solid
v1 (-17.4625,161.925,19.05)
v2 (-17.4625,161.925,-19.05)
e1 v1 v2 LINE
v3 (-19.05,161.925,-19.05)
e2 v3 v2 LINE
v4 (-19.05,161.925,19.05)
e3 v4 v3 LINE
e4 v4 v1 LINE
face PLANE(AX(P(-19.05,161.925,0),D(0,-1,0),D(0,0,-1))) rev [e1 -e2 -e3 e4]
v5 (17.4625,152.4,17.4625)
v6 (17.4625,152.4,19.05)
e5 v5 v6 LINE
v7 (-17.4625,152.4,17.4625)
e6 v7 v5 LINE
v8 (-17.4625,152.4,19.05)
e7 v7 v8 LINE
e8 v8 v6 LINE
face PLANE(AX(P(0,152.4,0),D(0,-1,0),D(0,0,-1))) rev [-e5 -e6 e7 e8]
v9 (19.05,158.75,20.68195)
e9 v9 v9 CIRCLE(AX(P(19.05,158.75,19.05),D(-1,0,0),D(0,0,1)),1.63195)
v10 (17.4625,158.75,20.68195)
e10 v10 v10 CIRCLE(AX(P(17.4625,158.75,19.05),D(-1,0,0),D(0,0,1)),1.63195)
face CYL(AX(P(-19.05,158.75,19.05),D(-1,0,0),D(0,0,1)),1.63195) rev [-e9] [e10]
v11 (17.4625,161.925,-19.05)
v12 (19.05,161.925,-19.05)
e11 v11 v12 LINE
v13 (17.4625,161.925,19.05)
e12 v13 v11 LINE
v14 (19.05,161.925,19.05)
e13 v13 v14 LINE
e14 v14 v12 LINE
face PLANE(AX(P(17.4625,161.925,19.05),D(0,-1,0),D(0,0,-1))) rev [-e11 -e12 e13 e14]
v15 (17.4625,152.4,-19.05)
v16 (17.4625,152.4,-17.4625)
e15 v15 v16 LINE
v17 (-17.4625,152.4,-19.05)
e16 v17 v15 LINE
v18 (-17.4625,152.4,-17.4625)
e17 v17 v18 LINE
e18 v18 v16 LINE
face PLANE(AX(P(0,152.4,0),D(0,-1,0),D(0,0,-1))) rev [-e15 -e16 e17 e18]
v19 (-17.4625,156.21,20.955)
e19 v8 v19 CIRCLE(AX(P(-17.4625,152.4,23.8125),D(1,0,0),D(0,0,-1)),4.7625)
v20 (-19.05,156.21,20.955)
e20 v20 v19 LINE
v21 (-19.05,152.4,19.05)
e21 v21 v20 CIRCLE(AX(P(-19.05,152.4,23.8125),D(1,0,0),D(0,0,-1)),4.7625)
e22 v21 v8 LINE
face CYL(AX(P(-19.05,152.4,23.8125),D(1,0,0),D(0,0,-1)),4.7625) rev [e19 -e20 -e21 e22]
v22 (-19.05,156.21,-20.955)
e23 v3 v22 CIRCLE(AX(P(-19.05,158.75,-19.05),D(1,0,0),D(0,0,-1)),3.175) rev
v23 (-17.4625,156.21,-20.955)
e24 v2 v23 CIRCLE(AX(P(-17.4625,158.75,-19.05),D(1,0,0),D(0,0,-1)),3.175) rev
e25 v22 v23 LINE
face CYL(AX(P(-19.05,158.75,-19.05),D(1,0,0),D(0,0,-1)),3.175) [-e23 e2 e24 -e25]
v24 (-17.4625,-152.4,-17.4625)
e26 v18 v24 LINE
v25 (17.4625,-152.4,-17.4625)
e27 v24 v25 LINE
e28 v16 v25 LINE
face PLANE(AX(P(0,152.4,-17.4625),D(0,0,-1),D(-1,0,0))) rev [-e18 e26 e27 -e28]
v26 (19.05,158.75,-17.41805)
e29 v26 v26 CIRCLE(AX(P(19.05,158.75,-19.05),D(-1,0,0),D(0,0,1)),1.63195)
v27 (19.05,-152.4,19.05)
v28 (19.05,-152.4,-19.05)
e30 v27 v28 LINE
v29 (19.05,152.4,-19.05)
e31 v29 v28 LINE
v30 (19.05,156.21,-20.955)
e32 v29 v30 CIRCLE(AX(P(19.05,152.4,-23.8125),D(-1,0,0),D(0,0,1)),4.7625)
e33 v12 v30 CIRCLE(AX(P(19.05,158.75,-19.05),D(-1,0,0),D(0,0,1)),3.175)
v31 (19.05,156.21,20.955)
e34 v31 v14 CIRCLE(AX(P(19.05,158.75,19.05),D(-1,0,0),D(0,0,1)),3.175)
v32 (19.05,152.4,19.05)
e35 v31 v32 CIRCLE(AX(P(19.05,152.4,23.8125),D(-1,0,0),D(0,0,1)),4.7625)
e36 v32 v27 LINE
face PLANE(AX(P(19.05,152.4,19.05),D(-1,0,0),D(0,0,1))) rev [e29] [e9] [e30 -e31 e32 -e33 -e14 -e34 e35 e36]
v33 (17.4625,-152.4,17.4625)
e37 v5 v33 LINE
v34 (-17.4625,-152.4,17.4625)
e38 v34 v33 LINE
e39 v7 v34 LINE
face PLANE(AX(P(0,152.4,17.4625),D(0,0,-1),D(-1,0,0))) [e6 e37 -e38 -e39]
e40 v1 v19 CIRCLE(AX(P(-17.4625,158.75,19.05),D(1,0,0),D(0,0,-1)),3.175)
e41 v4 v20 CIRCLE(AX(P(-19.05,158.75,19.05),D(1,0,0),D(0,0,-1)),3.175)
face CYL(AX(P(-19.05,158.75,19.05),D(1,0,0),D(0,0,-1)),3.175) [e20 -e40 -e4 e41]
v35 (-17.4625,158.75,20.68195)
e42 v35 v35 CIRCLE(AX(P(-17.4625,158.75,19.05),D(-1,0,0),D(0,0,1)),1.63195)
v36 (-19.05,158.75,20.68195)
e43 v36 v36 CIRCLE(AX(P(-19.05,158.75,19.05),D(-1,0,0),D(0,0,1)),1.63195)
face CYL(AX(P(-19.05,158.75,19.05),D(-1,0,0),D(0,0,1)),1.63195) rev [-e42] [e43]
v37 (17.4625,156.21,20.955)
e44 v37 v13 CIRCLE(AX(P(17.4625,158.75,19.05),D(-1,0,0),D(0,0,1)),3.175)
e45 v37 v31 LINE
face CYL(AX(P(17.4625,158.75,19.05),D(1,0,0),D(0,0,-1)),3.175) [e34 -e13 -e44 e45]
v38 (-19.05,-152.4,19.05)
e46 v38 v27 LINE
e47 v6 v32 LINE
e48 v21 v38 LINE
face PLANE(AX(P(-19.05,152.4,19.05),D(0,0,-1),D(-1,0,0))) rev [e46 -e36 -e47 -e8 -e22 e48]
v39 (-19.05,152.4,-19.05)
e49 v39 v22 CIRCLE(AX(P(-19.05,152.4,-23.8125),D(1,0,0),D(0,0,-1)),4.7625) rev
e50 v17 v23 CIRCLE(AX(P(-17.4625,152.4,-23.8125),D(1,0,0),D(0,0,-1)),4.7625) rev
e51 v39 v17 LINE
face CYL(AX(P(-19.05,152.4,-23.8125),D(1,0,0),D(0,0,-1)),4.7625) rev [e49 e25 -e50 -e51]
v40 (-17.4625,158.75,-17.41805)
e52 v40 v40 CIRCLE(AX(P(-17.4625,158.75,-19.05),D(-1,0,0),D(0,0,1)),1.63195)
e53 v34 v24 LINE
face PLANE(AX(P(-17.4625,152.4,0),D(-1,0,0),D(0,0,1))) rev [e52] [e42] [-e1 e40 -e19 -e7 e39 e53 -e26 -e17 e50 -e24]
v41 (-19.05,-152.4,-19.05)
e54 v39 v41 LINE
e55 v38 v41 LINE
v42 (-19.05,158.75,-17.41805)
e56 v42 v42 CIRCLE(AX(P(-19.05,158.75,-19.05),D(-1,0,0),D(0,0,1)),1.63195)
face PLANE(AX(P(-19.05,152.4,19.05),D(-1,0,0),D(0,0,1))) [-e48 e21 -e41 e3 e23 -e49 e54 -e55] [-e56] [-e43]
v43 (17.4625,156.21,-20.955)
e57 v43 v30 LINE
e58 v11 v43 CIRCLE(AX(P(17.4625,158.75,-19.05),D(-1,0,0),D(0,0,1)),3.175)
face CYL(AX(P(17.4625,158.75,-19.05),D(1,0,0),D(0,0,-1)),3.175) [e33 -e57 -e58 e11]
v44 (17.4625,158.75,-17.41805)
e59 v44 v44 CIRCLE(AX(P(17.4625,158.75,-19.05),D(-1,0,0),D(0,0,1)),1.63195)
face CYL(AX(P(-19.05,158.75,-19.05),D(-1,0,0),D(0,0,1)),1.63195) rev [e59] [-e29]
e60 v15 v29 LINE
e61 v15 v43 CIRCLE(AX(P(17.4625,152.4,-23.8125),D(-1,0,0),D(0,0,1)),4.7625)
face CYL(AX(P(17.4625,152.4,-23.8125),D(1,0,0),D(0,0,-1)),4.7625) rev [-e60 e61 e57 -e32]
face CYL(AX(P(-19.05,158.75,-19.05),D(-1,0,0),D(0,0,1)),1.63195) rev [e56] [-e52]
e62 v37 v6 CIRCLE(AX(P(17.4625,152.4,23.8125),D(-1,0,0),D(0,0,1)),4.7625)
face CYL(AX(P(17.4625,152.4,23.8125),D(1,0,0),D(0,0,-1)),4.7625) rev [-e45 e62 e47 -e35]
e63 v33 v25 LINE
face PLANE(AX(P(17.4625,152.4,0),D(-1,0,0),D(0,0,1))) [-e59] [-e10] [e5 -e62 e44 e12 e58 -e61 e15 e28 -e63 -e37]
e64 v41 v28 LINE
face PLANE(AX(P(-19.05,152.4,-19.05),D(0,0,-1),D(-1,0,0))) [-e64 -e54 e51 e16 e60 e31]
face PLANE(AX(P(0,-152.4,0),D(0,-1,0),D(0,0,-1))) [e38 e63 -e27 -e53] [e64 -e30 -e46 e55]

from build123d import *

# Parameters (mm, degrees)
SKETCH1_W             = 38.1
SKETCH1_H             = 38.1
SKETCH1_W_2           = 34.925
SKETCH1_H_2           = 34.925
EXTRUDE_THIN1_DEPTH   = 152.4
BOSS_EXTRUDE1_DEPTH   = 1.5875
BOSS_EXTRUDE2_START   = 34.925
BOSS_EXTRUDE2_DEPTH   = 1.5875
F_4_CLEARANCE_HOLE1_D = 3.2639


# Read off the part's stored shape, not the designer's step: Boss-Extrude2
with BuildPart() as part:
    # Sketch1 → Extrude-Thin1 (new, symmetric)
    with BuildSketch(Plane(origin=(0, 0, 0), x_dir=(1, 0, 0), z_dir=(0, 1, 0))):
        Rectangle(SKETCH1_W, SKETCH1_H)
        Rectangle(SKETCH1_W_2, SKETCH1_H_2, mode=Mode.SUBTRACT)
    extrude(amount=EXTRUDE_THIN1_DEPTH, both=True)

    # Sketch3 → Boss-Extrude1 (add)
    with BuildSketch(Plane(origin=(-17.4625, 0, 0), x_dir=(0, 0, -1), z_dir=(1, 0, 0))):
        with BuildLine():
            Line((-19.05, 152.4), (19.05, 152.4))
            ThreePointArc((19.05, 152.4), (19.552790503, 154.529854749), (20.955, 156.21))
            ThreePointArc((20.955, 156.21), (22.062069471, 159.754023157), (19.05, 161.925))
            Line((19.05, 161.925), (-19.05, 161.925))
            ThreePointArc((-19.05, 161.925), (-22.062069471, 159.754023157), (-20.955, 156.21))
            ThreePointArc((-20.955, 156.21), (-19.552790503, 154.529854749), (-19.05, 152.4))
        make_face()
    extrude(amount=-BOSS_EXTRUDE1_DEPTH)

    # Boss-Extrude2 outline → Boss-Extrude2 (add)
    with BuildSketch(Plane(origin=(-17.4625, 0, 0), x_dir=(0, 0, -1), z_dir=(1, 0, 0)).offset(BOSS_EXTRUDE2_START)):
        with BuildLine():
            Line((19.05, 161.925), (-19.05, 161.925))
            ThreePointArc((-19.05, 161.925), (-22.062069471, 159.754023157), (-20.955, 156.21))
            ThreePointArc((-20.955, 156.21), (-19.552790503, 154.529854749), (-19.05, 152.4))
            Line((-19.05, 152.4), (19.05, 152.4))
            ThreePointArc((19.05, 152.4), (19.552790503, 154.529854749), (20.955, 156.21))
            ThreePointArc((20.955, 156.21), (22.062069471, 159.754023157), (19.05, 161.925))
        make_face()
    extrude(amount=BOSS_EXTRUDE2_DEPTH)

    # #4 Clearance Hole1 (through all)
    with Locations(Plane.ZY.offset(19.05)):
        with Locations((-19.05, 158.75), (19.05, 158.75)):
            Hole(F_4_CLEARANCE_HOLE1_D / 2)


solid = part.part
